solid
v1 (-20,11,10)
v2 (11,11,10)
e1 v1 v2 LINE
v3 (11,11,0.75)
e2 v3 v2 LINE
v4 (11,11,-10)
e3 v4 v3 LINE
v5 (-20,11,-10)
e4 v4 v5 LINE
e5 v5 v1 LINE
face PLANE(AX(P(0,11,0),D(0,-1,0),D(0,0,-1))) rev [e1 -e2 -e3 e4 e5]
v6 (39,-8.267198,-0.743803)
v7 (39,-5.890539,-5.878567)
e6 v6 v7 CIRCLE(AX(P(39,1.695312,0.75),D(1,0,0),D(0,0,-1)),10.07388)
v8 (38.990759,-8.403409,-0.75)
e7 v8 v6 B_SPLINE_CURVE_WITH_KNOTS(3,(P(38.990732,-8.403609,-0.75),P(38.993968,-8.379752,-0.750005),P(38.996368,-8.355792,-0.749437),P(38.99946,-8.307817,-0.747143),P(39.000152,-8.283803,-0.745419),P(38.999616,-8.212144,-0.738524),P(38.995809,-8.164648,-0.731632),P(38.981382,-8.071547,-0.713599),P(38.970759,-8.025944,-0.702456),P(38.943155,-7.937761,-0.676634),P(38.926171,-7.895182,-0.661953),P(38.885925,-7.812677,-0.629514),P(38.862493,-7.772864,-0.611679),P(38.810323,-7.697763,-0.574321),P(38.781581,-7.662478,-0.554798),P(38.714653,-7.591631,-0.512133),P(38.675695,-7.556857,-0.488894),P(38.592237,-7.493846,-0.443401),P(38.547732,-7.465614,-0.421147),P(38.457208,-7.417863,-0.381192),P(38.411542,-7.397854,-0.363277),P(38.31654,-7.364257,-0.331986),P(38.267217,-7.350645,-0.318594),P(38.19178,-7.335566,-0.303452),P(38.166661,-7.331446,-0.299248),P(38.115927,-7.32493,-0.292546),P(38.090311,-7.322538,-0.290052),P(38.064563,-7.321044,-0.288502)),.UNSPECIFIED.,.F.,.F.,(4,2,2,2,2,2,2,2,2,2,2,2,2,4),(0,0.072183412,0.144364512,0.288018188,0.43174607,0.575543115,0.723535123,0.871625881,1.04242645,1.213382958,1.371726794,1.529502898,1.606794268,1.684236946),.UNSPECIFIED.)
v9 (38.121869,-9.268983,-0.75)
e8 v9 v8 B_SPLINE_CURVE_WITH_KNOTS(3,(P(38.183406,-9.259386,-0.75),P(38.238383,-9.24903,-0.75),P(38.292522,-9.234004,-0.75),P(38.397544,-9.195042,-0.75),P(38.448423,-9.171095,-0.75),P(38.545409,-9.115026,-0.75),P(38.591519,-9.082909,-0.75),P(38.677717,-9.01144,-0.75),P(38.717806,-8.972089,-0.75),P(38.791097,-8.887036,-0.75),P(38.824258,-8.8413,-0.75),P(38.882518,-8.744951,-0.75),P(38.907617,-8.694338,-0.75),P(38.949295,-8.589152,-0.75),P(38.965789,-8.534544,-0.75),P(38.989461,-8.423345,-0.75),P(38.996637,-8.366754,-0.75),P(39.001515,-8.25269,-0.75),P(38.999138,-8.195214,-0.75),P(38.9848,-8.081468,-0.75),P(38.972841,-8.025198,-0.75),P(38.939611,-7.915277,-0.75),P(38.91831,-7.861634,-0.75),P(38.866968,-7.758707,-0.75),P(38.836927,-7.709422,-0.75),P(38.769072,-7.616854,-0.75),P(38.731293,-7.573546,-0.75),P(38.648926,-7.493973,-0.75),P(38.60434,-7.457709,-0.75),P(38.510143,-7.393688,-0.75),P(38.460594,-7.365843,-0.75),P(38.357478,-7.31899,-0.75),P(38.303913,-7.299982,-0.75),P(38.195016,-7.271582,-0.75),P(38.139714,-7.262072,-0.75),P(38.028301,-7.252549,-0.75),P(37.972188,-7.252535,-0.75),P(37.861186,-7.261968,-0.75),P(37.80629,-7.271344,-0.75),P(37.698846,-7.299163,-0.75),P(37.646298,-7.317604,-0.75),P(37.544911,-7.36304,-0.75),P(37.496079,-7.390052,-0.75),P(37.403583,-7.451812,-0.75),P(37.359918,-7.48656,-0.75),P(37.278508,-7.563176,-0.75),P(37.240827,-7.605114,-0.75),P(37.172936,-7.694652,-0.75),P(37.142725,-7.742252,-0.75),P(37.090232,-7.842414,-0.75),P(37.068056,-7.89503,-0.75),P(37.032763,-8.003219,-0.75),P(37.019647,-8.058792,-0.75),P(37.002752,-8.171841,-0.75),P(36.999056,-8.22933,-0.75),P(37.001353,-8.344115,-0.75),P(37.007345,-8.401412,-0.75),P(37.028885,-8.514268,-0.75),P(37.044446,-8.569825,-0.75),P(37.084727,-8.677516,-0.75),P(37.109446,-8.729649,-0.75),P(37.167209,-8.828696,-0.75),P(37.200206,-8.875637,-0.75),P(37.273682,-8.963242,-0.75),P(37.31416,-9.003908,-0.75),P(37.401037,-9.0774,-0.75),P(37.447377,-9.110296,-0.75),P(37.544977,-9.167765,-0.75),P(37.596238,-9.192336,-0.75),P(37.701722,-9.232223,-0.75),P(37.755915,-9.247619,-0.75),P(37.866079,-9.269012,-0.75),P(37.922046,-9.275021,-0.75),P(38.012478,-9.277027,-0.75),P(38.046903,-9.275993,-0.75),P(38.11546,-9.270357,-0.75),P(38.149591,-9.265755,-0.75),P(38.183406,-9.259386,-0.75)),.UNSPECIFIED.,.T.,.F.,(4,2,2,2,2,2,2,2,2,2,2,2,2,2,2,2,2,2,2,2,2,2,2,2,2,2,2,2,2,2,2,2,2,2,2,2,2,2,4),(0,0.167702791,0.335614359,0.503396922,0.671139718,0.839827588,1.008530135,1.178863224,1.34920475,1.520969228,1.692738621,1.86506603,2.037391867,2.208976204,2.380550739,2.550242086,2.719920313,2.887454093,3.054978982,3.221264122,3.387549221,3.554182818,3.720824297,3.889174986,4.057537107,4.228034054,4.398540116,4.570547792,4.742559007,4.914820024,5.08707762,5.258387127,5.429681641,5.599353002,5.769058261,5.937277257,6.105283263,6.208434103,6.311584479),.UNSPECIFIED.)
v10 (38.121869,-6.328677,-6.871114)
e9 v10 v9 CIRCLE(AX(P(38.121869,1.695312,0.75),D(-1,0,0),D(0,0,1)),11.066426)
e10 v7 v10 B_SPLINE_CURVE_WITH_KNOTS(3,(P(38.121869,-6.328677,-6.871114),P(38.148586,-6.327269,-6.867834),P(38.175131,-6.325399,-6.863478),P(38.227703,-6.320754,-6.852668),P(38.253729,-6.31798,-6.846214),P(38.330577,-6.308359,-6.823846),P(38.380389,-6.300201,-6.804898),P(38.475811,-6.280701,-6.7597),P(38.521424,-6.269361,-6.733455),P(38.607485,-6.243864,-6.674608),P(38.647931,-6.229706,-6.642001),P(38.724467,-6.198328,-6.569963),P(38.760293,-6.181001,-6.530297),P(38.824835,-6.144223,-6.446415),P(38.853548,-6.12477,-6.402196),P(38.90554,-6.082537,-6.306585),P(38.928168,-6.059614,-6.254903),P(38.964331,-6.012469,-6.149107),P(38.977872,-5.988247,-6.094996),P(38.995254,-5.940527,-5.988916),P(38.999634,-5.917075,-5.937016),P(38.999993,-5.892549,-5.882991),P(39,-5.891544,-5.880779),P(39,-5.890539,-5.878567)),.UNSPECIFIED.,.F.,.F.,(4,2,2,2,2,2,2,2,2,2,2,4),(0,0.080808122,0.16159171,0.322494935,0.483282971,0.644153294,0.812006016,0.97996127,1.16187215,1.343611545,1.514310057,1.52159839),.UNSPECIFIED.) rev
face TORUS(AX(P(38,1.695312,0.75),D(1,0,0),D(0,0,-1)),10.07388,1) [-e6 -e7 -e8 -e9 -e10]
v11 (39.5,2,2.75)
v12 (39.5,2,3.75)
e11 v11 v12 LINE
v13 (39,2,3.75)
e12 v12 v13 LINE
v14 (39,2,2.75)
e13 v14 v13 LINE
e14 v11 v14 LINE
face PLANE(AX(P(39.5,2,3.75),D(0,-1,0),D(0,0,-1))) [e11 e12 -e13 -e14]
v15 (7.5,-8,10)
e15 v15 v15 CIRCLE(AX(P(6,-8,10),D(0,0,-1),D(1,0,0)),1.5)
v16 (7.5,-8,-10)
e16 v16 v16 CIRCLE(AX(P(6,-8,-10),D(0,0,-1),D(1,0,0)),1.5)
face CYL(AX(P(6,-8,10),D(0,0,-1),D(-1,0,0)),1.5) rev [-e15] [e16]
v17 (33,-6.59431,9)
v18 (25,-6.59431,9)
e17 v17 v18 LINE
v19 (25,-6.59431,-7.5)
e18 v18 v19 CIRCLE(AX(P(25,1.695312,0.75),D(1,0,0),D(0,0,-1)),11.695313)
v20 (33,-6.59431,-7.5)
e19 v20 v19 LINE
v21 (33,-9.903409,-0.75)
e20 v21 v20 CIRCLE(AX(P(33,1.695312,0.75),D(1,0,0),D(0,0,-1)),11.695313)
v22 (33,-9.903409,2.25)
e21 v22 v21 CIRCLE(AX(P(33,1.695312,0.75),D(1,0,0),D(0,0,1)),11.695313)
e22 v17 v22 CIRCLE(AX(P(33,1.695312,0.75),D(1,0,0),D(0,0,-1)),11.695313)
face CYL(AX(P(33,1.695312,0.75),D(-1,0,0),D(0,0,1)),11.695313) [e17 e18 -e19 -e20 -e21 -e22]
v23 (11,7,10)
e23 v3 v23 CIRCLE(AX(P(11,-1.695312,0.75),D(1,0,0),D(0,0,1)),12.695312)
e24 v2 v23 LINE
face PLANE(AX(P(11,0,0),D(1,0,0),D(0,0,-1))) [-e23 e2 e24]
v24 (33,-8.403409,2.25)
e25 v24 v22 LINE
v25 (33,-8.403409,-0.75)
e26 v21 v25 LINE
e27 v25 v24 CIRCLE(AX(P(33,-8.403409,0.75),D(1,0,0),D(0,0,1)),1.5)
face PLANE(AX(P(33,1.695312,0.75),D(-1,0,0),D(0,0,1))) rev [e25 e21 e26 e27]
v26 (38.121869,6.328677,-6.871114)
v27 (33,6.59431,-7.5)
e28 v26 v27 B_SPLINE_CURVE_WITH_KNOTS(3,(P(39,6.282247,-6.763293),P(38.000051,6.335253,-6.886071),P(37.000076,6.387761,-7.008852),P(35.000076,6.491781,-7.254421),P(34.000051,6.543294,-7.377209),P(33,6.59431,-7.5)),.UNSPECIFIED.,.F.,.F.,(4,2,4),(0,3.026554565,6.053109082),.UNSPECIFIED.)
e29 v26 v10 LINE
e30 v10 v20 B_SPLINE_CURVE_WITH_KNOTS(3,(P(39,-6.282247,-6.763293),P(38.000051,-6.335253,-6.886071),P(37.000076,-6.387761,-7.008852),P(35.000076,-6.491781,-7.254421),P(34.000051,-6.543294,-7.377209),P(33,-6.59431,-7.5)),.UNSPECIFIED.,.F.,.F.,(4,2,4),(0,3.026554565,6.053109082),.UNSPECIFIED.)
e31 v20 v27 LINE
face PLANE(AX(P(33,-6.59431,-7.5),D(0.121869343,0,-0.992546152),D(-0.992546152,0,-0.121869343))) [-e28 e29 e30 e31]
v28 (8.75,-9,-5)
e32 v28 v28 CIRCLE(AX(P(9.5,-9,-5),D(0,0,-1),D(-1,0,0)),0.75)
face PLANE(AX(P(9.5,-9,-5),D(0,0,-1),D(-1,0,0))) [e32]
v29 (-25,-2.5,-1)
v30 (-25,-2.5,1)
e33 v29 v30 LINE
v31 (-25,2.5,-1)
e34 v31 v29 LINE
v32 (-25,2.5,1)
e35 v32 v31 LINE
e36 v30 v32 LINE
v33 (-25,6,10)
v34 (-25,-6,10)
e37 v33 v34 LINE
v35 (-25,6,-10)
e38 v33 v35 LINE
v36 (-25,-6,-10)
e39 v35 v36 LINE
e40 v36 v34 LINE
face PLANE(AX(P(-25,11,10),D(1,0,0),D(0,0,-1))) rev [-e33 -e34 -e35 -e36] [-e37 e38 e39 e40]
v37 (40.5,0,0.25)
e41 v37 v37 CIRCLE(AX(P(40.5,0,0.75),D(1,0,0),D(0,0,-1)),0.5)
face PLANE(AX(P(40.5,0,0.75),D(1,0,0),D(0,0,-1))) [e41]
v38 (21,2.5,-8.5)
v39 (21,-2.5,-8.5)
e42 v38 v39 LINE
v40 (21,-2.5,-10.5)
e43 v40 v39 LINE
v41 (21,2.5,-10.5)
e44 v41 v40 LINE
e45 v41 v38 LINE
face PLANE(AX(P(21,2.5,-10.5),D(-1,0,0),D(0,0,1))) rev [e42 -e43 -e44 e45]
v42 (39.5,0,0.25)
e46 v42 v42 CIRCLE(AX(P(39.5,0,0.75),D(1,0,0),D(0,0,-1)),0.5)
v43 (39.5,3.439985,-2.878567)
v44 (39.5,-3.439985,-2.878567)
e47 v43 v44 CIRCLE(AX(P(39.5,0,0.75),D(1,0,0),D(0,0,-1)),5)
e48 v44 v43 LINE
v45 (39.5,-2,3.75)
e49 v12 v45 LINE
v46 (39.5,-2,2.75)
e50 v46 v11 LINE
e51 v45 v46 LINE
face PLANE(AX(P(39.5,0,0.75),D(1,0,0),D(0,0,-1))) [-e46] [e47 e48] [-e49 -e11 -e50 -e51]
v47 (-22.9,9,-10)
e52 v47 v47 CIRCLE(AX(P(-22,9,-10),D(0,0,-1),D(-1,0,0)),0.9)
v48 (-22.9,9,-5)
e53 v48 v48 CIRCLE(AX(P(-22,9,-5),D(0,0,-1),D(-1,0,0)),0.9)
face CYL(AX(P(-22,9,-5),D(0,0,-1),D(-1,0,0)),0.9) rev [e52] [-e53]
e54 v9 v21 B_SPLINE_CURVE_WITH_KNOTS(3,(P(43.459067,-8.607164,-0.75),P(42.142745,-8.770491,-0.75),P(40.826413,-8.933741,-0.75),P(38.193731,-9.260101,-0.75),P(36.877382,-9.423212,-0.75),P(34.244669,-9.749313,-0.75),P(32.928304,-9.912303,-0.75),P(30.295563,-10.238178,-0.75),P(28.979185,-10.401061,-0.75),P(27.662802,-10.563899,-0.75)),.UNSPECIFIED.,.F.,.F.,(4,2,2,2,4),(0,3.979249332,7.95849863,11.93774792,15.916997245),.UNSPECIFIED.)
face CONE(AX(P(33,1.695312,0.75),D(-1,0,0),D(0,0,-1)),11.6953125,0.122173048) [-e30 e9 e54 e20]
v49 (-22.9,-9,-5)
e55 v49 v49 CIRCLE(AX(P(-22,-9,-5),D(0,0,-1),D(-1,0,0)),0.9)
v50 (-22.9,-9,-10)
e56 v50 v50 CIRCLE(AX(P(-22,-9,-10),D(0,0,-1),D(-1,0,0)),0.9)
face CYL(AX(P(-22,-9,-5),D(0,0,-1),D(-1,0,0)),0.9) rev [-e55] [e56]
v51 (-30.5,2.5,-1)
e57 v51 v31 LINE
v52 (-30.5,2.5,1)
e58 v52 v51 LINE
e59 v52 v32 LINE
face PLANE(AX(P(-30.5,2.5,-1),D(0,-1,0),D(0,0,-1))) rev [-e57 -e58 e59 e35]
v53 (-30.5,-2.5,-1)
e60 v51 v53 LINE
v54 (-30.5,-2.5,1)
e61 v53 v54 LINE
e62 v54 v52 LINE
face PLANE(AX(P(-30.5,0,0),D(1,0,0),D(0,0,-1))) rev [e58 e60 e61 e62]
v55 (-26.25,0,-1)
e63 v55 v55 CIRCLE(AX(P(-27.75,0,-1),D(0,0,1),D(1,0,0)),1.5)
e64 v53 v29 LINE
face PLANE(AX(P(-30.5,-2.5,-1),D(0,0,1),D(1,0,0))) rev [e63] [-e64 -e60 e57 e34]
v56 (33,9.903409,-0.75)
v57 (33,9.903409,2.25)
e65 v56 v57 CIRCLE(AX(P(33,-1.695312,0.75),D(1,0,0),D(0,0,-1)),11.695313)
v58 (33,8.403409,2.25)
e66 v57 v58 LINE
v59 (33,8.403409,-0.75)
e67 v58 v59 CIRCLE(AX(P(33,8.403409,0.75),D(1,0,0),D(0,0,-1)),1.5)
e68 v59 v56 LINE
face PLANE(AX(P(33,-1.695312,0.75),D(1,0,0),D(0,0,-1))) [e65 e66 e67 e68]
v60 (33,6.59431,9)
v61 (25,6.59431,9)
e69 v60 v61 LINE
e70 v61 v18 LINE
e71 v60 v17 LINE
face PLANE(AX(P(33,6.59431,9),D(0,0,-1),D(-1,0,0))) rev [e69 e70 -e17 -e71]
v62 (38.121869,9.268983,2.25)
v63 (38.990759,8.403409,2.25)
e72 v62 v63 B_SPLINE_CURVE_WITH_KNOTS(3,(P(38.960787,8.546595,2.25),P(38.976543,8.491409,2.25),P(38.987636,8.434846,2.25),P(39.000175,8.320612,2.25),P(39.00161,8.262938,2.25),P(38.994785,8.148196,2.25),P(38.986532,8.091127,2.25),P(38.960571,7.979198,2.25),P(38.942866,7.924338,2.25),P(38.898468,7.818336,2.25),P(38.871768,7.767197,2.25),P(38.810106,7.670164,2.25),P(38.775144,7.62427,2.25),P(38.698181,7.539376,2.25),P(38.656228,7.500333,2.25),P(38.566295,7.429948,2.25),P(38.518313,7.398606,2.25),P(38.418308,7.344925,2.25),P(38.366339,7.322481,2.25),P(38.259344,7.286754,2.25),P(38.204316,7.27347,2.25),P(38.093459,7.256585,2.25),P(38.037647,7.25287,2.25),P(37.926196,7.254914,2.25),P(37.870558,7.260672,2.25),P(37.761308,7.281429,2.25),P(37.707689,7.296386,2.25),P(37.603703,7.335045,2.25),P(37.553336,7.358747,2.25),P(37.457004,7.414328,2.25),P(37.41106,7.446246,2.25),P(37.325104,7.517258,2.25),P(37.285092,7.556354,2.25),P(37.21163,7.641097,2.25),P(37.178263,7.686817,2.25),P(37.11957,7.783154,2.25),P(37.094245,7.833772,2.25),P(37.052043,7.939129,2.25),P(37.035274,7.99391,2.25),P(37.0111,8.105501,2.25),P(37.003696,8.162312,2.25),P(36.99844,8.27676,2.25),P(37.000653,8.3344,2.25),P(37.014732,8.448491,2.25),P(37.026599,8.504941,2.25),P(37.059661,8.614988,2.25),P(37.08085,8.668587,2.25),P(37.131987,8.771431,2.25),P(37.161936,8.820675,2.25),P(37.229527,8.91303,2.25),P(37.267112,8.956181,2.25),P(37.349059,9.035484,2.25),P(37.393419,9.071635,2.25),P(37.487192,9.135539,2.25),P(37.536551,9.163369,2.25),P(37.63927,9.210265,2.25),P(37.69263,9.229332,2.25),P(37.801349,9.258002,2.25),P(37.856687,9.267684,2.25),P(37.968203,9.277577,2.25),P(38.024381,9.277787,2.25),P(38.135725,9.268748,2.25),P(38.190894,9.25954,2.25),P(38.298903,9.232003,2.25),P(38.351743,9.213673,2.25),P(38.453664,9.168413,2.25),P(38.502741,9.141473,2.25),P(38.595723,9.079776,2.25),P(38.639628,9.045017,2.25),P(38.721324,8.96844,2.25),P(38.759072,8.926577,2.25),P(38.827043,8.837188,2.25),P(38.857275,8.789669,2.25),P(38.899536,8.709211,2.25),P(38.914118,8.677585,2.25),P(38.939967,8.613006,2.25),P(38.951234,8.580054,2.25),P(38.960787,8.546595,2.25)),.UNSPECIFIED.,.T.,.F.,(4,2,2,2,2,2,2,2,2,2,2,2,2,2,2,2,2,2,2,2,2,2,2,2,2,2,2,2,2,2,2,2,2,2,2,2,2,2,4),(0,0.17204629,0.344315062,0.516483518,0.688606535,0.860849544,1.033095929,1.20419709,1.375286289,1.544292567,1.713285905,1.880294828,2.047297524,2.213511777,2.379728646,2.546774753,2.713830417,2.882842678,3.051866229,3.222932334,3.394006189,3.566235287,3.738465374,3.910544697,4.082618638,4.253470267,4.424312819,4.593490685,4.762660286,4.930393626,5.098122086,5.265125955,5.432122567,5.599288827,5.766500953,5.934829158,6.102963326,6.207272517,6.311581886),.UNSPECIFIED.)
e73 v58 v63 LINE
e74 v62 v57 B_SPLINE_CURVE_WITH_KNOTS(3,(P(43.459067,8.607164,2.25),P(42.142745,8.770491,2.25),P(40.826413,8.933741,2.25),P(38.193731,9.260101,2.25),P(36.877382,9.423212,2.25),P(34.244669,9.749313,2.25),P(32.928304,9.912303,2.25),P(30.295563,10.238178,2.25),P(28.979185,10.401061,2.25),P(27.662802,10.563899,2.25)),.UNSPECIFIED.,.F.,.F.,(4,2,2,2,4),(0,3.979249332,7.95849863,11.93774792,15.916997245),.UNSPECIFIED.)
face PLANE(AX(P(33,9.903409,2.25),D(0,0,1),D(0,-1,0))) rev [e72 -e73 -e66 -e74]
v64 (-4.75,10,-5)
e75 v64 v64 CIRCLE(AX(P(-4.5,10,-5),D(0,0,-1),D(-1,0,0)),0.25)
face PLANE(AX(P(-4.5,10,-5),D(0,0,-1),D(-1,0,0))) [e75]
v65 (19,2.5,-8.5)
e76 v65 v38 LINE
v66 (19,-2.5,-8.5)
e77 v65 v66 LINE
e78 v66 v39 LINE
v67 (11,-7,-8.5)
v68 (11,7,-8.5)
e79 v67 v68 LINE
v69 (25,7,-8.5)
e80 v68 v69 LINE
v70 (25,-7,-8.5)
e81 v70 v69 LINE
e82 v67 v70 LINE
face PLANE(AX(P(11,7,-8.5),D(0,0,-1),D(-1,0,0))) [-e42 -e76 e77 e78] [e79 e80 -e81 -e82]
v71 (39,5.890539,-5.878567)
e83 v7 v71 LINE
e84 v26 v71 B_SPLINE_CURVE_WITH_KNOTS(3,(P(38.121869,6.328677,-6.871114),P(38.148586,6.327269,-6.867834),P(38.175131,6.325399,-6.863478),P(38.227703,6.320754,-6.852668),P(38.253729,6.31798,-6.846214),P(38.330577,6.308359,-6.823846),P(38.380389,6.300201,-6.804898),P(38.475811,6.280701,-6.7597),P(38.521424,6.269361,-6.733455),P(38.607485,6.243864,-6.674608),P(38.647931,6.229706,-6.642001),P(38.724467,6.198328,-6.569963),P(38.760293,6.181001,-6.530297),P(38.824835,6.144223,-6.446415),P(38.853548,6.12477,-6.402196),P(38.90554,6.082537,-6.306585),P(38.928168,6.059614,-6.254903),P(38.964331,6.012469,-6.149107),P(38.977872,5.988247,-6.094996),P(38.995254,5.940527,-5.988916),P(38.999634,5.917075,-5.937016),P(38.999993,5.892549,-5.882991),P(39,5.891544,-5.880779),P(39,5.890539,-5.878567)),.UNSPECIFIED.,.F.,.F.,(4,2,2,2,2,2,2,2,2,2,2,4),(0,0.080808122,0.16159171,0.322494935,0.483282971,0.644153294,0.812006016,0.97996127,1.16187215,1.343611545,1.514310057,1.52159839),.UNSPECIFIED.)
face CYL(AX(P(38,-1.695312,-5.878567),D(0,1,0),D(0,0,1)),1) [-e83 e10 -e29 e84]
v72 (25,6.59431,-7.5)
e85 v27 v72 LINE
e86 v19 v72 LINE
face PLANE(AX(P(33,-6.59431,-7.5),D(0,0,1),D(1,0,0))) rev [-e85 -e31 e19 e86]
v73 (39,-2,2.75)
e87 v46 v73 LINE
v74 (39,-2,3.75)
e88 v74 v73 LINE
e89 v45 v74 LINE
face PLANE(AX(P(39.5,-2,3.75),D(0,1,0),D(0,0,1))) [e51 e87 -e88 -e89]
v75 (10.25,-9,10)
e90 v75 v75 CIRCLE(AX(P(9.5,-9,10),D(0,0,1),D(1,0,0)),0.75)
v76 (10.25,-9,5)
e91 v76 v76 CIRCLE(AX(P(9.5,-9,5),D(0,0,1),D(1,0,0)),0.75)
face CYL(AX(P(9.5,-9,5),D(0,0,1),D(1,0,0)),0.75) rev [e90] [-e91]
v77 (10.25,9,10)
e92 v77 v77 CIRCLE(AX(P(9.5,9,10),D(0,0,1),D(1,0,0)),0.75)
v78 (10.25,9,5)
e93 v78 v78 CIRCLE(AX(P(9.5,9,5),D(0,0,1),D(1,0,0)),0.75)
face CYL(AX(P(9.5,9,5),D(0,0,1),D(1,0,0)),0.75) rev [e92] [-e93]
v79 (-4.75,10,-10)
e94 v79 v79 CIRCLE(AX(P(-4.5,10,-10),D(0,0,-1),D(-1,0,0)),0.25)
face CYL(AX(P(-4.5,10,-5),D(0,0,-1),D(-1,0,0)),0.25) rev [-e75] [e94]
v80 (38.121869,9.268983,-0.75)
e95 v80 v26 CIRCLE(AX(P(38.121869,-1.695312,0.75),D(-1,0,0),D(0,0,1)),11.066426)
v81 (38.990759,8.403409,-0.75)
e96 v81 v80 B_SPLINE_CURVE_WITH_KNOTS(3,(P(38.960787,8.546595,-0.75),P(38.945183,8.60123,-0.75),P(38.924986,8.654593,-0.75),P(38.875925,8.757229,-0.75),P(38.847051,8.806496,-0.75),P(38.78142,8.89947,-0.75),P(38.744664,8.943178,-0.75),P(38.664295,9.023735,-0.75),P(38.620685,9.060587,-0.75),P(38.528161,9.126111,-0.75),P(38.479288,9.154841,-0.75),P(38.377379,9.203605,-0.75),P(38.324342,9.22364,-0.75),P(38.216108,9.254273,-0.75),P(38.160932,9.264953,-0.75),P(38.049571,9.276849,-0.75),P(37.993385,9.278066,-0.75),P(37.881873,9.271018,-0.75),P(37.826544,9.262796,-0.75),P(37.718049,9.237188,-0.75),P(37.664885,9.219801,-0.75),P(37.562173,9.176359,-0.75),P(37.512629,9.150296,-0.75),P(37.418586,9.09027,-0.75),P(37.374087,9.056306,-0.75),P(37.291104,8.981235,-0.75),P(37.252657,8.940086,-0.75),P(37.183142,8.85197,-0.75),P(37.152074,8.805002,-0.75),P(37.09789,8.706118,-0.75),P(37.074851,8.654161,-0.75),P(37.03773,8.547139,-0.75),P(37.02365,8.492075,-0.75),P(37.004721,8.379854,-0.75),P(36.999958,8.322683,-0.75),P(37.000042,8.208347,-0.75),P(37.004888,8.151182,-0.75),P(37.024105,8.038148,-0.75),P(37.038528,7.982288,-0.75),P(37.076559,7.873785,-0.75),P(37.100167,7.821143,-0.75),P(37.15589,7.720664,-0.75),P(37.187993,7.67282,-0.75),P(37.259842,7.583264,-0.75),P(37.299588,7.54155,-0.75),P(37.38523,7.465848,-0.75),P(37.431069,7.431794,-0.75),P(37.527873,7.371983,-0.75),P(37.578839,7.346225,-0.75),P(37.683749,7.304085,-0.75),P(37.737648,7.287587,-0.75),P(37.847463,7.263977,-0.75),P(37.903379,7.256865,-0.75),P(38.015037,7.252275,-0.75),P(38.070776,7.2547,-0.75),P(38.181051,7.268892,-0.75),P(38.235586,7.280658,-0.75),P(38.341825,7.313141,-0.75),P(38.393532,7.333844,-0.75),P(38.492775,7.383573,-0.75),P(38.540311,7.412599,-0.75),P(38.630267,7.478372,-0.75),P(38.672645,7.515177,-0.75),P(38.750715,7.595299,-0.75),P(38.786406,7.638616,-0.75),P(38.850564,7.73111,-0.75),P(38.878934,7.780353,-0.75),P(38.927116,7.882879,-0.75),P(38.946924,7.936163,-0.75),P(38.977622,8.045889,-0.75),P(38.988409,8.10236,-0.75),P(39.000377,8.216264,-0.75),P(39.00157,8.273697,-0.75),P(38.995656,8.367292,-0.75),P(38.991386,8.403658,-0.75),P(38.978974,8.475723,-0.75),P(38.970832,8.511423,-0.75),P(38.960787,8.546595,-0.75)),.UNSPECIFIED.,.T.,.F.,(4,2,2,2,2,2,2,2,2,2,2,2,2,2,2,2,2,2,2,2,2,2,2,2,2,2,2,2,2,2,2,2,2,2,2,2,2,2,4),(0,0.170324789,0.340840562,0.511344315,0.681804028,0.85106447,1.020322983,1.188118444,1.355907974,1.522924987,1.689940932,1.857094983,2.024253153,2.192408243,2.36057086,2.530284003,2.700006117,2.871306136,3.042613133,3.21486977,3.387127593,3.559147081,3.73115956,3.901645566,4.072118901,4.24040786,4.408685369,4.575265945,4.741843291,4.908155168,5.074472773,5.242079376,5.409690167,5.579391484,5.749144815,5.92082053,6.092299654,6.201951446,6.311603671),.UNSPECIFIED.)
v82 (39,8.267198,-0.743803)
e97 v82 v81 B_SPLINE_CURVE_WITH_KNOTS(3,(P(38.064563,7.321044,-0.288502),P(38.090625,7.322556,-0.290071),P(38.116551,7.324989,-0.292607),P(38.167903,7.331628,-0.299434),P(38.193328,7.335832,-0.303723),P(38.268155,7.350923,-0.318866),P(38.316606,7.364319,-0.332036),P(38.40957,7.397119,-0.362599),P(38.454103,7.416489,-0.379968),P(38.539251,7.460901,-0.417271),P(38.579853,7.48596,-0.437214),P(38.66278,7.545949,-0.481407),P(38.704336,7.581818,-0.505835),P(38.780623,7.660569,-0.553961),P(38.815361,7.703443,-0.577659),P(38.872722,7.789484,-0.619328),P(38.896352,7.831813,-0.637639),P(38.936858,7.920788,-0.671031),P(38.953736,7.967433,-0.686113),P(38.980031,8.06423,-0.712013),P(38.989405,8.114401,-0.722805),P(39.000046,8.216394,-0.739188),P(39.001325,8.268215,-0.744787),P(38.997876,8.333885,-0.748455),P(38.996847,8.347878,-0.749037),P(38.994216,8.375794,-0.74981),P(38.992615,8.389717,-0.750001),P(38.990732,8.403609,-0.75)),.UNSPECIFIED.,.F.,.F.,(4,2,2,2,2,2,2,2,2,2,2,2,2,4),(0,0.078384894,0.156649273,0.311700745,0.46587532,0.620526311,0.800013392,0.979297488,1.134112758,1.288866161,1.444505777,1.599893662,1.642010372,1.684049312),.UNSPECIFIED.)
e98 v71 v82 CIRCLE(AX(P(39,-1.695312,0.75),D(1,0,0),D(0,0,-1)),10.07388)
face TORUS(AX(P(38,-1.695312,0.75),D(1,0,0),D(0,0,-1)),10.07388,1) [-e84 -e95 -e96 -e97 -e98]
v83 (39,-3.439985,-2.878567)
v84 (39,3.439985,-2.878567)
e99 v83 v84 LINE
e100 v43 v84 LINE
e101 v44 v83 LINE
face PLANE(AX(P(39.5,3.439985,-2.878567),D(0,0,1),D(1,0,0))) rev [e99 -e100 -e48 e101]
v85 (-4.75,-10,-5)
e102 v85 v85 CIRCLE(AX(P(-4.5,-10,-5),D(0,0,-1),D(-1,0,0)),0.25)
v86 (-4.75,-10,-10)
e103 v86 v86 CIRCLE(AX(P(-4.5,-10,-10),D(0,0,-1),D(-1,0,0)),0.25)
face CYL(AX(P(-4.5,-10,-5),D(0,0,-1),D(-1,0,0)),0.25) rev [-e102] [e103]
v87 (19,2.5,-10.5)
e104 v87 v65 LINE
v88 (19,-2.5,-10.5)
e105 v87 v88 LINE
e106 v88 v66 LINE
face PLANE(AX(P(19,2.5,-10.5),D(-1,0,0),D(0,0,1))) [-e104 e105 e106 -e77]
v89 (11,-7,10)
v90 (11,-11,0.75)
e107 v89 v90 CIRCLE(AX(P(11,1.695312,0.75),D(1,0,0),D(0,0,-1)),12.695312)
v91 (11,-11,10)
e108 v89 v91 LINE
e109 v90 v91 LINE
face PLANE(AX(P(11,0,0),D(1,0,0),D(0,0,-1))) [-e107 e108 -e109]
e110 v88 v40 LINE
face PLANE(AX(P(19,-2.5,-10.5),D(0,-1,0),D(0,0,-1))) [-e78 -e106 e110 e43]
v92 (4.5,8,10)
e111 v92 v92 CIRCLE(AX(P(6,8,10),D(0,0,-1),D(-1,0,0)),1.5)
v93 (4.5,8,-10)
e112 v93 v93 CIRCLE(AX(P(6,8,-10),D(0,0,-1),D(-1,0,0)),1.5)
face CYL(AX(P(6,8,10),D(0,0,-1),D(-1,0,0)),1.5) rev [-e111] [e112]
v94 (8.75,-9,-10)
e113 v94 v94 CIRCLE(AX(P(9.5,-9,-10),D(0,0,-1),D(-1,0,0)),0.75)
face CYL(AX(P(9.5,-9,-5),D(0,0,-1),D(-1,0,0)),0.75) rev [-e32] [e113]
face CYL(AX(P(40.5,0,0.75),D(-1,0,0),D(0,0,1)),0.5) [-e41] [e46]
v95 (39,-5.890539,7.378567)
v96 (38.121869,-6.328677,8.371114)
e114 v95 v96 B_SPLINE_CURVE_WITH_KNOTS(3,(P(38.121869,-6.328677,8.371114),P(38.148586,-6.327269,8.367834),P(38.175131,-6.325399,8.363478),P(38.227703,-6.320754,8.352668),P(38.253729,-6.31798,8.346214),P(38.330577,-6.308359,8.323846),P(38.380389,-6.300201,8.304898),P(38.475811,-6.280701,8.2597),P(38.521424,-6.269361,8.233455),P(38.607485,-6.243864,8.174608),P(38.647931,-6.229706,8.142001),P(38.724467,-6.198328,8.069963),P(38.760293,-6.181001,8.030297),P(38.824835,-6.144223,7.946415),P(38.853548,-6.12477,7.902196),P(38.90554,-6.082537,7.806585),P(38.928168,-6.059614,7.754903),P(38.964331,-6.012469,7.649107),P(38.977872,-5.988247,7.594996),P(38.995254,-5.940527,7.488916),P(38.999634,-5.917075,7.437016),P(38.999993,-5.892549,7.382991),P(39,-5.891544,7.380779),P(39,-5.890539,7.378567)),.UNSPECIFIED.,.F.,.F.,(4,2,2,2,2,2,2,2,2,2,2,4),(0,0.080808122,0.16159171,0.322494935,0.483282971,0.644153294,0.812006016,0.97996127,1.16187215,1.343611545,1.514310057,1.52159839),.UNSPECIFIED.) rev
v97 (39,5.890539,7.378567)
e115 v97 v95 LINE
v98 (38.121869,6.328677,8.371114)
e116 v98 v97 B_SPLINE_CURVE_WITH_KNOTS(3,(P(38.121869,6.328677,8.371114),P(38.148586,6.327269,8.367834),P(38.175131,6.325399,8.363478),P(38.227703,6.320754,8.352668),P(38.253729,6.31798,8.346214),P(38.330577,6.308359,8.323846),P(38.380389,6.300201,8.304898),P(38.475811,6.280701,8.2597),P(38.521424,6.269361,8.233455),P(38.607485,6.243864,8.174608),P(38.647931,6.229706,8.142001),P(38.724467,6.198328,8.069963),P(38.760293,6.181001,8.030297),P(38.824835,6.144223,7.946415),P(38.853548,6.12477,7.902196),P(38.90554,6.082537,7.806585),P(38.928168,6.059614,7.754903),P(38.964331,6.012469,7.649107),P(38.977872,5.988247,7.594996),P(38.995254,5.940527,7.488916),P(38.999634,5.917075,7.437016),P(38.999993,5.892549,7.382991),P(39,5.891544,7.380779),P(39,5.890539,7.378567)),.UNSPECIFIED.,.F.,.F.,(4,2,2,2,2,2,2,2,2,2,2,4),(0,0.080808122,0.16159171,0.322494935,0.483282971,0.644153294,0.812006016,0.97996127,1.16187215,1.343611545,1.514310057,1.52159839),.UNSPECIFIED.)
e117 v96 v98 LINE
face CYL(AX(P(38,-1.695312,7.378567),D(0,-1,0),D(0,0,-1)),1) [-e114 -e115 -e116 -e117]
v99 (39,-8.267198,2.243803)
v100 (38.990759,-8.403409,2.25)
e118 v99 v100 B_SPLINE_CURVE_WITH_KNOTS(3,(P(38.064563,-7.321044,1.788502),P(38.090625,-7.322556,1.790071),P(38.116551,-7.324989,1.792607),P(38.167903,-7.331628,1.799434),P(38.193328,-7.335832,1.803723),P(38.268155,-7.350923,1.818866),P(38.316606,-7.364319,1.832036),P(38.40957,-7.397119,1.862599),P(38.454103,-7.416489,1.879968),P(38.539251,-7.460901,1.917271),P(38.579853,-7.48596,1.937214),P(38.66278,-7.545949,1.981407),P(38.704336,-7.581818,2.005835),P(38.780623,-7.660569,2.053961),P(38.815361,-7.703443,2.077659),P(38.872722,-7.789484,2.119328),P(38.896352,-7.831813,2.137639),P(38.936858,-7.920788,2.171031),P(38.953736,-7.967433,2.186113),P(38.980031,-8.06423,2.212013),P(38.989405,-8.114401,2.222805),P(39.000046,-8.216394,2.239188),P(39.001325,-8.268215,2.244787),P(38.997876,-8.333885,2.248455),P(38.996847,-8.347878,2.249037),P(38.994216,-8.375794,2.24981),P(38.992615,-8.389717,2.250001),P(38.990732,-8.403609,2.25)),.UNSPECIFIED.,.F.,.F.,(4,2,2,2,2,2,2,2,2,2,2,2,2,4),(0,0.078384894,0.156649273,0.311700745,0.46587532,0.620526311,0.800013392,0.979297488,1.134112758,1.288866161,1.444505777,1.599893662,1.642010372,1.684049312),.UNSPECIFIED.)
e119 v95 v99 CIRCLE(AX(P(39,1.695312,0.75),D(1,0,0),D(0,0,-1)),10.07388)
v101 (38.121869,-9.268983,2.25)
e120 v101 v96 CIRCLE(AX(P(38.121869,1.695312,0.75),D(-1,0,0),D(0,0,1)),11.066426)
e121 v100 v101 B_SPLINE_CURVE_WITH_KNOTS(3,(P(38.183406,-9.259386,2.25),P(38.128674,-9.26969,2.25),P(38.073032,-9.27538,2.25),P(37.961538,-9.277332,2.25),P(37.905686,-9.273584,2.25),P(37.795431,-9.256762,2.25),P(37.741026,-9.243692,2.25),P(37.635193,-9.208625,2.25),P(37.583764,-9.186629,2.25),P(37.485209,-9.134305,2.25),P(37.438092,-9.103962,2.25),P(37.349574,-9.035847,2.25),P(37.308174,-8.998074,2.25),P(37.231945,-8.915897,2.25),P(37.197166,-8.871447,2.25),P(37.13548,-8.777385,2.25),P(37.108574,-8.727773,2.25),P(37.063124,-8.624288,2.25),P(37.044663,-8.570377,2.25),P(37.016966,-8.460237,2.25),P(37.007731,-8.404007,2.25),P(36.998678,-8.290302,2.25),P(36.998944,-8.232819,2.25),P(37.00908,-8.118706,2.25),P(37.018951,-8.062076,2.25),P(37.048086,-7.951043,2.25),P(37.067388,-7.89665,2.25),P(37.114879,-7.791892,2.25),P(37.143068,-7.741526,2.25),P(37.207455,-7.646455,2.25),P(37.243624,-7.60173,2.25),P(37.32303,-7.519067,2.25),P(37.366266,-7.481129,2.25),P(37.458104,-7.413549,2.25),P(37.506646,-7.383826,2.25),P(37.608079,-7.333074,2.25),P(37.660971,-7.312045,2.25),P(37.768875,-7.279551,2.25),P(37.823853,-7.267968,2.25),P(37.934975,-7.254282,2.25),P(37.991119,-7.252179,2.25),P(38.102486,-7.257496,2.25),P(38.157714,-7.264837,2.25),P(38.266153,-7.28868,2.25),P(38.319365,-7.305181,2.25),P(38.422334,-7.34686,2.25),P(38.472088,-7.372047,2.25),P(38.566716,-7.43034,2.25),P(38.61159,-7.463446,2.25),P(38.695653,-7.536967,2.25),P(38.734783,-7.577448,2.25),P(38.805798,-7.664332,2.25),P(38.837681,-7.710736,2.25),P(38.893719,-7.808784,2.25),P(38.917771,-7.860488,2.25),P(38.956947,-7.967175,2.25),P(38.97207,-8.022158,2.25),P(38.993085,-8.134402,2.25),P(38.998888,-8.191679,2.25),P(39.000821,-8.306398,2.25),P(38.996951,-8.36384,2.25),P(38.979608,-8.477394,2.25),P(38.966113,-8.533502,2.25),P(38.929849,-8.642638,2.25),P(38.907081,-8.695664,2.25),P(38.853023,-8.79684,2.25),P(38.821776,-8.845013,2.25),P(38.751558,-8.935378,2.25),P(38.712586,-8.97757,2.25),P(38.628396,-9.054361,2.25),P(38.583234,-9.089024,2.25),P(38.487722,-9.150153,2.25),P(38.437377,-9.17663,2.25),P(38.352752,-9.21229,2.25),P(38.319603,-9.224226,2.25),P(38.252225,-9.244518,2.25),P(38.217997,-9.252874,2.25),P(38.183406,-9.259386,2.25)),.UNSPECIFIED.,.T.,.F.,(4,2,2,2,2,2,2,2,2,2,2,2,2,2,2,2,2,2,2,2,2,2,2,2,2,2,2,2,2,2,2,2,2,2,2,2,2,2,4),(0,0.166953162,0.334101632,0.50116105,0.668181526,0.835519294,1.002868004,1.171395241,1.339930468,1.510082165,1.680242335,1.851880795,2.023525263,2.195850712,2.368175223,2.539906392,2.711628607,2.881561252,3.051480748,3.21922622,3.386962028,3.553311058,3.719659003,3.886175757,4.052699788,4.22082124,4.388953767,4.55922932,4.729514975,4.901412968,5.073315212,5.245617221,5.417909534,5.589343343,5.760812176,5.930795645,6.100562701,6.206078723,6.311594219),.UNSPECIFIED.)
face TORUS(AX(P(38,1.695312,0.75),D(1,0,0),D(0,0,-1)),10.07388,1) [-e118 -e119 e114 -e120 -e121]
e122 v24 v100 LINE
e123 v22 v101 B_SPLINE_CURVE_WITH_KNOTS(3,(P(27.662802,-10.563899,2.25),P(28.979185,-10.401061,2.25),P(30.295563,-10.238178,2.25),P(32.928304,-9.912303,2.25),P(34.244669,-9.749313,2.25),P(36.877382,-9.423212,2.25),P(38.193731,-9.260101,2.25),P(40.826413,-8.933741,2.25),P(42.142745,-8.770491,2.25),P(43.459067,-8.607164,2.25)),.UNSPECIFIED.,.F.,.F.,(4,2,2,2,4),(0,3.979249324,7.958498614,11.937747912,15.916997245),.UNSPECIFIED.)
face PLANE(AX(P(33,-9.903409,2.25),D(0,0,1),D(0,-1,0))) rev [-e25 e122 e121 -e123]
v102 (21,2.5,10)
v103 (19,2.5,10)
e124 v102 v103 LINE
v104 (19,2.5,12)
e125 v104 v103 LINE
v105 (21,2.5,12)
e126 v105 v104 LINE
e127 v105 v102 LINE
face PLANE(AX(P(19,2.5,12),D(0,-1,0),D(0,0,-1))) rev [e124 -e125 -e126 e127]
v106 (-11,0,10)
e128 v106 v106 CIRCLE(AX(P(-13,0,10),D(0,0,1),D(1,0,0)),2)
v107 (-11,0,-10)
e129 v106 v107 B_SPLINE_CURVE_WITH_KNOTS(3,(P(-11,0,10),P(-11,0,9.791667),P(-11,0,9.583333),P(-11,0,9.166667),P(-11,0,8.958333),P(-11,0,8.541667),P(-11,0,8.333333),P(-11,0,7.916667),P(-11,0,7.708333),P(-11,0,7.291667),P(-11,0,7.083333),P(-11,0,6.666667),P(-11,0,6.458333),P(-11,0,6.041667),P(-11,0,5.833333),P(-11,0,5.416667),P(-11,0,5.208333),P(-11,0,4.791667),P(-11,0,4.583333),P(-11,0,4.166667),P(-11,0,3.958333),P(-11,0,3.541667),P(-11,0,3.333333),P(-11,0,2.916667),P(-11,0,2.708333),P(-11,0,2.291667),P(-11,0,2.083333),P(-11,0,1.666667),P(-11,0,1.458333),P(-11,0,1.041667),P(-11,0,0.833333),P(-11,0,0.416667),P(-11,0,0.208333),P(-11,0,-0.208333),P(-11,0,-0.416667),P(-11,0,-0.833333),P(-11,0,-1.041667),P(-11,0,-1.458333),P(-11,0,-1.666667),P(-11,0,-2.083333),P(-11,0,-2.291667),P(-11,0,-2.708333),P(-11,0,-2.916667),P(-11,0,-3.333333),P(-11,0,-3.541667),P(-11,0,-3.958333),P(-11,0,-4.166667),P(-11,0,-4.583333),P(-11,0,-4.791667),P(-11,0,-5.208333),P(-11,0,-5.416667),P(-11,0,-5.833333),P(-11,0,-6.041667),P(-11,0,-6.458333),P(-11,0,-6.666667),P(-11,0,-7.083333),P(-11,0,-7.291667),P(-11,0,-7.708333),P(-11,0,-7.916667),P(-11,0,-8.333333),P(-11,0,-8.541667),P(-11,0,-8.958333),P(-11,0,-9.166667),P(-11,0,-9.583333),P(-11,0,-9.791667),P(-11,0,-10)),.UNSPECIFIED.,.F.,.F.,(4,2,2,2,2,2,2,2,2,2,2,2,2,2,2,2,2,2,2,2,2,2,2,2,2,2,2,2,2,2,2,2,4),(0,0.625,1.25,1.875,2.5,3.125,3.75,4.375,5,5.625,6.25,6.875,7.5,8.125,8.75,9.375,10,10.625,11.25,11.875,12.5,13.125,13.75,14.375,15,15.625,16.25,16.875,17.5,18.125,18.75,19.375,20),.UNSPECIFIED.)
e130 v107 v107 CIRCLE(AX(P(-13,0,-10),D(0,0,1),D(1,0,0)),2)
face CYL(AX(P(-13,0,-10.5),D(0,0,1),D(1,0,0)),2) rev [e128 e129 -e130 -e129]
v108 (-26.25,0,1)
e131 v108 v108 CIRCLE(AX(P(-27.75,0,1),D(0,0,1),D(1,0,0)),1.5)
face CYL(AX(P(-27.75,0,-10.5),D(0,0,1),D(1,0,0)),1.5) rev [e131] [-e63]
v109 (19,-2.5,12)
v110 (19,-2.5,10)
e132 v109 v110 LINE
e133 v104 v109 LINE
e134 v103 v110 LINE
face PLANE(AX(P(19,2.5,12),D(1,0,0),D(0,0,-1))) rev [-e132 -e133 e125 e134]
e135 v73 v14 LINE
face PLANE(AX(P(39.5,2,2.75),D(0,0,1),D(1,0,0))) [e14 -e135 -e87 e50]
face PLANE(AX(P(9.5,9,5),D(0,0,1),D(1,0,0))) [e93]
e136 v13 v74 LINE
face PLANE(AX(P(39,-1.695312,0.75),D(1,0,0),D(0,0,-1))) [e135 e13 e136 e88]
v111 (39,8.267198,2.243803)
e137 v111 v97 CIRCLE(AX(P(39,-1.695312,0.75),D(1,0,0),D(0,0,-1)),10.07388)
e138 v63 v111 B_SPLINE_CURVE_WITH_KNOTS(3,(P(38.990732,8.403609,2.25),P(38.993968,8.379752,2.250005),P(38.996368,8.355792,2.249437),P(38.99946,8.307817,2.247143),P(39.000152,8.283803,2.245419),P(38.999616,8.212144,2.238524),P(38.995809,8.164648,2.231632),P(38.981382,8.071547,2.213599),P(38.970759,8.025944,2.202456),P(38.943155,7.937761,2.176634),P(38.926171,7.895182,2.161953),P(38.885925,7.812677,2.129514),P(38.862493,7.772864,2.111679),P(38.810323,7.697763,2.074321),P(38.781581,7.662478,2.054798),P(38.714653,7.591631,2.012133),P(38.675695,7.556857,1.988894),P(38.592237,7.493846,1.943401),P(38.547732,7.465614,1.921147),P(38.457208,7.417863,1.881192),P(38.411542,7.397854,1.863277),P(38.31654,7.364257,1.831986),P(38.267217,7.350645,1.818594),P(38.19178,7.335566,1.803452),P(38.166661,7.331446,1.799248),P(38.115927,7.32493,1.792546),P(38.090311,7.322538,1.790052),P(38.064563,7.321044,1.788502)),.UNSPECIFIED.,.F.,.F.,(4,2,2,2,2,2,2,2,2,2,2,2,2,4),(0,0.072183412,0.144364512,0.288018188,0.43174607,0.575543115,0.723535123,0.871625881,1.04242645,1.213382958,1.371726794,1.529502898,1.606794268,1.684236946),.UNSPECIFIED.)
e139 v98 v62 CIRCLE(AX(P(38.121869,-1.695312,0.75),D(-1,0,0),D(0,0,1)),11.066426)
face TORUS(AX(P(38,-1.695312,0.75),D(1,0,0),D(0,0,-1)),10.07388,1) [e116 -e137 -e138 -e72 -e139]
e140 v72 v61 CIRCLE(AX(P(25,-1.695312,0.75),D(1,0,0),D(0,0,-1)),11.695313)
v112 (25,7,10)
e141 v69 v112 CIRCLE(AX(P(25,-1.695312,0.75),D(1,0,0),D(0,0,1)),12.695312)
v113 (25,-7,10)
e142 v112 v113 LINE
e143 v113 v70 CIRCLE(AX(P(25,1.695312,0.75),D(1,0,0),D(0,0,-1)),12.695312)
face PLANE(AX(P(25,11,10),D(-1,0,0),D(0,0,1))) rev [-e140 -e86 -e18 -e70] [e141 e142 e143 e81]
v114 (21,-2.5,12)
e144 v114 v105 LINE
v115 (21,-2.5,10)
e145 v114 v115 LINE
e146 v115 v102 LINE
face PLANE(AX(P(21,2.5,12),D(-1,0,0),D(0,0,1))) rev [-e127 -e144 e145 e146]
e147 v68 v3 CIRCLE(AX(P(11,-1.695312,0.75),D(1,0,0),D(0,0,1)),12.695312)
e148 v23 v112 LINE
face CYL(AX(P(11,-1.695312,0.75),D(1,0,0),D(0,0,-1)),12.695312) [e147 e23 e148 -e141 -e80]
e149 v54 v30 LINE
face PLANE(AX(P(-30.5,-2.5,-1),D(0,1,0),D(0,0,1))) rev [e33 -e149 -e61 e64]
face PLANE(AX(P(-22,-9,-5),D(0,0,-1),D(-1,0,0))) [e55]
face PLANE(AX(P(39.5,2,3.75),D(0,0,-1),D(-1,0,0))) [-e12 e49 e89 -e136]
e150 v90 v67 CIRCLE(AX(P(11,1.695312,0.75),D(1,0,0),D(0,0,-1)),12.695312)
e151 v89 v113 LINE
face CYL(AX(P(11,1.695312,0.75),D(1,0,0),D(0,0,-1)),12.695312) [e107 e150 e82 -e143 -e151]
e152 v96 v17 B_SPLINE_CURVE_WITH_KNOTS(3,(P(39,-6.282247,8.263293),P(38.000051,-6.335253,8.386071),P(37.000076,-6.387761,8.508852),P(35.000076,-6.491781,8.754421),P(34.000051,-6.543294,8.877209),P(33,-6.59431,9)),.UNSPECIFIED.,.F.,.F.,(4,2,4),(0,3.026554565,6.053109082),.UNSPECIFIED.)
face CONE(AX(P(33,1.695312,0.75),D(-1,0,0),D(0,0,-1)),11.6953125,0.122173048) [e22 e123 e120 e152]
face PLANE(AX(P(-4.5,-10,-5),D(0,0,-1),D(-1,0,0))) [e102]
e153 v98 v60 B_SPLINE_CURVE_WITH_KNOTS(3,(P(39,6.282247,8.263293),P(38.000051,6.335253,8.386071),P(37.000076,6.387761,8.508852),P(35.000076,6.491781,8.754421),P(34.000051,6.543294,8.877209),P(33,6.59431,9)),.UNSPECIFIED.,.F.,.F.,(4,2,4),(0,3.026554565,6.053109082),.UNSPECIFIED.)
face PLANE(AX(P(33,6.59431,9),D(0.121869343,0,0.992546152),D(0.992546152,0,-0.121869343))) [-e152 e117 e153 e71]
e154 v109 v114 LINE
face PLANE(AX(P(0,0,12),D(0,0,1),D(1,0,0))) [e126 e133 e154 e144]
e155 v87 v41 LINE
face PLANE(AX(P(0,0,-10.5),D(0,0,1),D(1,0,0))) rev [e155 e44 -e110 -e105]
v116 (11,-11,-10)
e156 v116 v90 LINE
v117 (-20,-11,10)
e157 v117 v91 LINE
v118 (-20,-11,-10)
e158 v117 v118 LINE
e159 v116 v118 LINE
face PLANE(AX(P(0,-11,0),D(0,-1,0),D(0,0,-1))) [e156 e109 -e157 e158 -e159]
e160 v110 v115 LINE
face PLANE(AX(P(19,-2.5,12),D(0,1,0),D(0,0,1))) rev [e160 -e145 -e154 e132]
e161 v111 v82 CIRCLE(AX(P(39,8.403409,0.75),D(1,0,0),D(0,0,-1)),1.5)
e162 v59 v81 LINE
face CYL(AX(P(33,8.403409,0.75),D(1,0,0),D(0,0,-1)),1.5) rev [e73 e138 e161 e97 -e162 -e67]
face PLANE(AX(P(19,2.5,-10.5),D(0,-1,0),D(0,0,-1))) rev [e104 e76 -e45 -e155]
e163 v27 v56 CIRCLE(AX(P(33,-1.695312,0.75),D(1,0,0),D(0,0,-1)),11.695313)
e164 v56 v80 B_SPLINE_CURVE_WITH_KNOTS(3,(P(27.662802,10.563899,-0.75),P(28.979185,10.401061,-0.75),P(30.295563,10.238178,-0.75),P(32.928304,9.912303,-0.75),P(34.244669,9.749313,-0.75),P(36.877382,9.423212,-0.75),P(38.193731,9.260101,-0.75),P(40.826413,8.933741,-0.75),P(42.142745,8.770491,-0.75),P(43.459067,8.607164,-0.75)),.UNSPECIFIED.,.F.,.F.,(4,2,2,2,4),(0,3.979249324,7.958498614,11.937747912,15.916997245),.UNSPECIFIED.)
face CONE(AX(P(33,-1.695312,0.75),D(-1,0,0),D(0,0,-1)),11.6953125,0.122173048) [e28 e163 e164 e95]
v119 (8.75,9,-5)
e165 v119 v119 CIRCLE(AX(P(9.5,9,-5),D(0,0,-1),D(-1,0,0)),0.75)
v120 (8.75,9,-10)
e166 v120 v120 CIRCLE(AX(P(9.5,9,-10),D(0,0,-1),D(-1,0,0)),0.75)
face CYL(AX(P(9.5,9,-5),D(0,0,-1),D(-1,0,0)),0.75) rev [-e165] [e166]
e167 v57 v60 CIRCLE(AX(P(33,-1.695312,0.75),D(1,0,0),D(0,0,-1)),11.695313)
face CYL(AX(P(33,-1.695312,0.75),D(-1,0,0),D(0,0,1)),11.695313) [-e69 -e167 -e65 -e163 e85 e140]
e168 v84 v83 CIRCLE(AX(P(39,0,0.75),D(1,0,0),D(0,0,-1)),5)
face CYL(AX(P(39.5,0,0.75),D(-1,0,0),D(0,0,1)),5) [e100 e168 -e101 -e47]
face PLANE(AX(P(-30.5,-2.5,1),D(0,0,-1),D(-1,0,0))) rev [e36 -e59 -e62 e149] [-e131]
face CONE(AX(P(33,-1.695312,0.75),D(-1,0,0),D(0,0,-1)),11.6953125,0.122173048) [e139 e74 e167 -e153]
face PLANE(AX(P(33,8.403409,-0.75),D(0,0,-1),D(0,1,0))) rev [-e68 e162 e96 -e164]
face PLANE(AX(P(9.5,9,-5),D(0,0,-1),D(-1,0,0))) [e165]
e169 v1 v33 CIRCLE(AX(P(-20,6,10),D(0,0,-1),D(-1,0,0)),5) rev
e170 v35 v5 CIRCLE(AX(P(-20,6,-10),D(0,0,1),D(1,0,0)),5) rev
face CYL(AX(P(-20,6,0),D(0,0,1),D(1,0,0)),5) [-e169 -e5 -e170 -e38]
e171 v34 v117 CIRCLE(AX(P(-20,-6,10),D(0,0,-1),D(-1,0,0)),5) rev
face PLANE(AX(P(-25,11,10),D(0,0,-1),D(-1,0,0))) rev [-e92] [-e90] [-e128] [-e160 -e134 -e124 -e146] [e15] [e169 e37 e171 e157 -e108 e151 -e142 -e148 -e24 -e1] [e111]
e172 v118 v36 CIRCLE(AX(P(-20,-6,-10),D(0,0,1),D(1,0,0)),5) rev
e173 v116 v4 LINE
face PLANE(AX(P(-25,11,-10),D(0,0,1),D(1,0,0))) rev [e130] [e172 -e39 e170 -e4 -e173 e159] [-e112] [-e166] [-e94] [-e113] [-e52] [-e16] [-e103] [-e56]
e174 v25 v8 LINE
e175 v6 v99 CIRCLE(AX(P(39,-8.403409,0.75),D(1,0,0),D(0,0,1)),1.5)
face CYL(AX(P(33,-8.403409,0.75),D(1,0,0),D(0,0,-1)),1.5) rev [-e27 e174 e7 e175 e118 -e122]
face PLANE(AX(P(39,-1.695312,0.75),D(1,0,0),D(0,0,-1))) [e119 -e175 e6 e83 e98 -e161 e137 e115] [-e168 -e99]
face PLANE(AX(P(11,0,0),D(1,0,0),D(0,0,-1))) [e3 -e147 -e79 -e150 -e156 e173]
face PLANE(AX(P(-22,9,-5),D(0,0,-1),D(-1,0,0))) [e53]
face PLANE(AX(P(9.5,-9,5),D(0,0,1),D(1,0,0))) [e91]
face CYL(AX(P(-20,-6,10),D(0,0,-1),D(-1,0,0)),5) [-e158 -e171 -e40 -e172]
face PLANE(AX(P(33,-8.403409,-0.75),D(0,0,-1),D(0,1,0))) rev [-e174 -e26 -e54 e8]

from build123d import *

# Parameters (mm, degrees)
CROQUIS1_W               = 50
CROQUIS1_H               = 20
SALIENTE_EXTRUIR1_DEPTH  = 11
REDONDEO1_R              = 5
CROQUIS2_OUTSIDE_W       = 33.634
CROQUIS2_OUTSIDE_H       = 35.634
CORTAR_EXTRUIR1_DEPTH    = 14
CROQUIS3_R               = 1.5
CORTAR_EXTRUIR2_DEPTH    = 34.85262176
CROQUIS4_W               = 2
CROQUIS4_H               = 5
SALIENTE_EXTRUIR2_DEPTH  = 2
CROQUIS5_W               = 2
CROQUIS5_H               = 5
SALIENTE_EXTRUIR5_DEPTH  = 2
CROQUIS6_R               = 0.75
CROQUIS6_R_2             = 0.25
CROQUIS6_R_3             = 0.9
CORTAR_EXTRUIR3_DEPTH    = 5
CORTAR_EXTRUIR4_START    = -5
CROQUIS7_R               = 0.75
CORTAR_EXTRUIR4_DEPTH    = 5
SALIENTE_EXTRUIR6_DEPTH  = 8
CROQUIS9_R               = 2
CORTAR_EXTRUIR5_DEPTH    = 41.376354466
SALIENTE_EXTRUIR7_DEPTH  = 6
SALIENTE_EXTRUIR7_DRAFT  = 7
REDONDEO2_R              = 1
CROQUIS12_W              = 1
CROQUIS12_H              = 4
SALIENTE_EXTRUIR8_DEPTH  = 0.5
CROQUIS13_R              = 0.5
SALIENTE_EXTRUIR9_DEPTH  = 1
CORTAR_EXTRUIR6_START    = -6
CORTAR_EXTRUIR6_DEPTH    = 6
CROQUIS15_W              = 2
CROQUIS15_H              = 5
SALIENTE_EXTRUIR10_DEPTH = 5.5
CROQUIS16_R              = 1.5
CORTAR_EXTRUIR7_DEPTH    = 44.514365444


with BuildPart() as part:
    # Croquis1 → Saliente-Extruir1 (new, symmetric)
    with BuildSketch(Plane(origin=(0, 0, 0), x_dir=(1, 0, 0), z_dir=(0, 1, 0))):
        Rectangle(CROQUIS1_W, CROQUIS1_H)
    extrude(amount=SALIENTE_EXTRUIR1_DEPTH, both=True)

    # Redondeo1
    redondeo1_edges = [part.edges().sort_by_distance(p)[0] for p in [
        (-25, 11, 0),
        (-25, -11, 0),
    ]]
    fillet(redondeo1_edges, radius=REDONDEO1_R)

    # Croquis2 outside → Cortar-Extruir1 (cut)
    with BuildSketch(Plane(origin=(25, 0, 0), x_dir=(0, 0, -1), z_dir=(1, 0, 0))):
        Rectangle(CROQUIS2_OUTSIDE_W, CROQUIS2_OUTSIDE_H)
        with BuildLine():
            Line((-10, 7), (-10, -7))
            ThreePointArc((-10, -7), (-0.75, -11), (8.5, -7))
            Line((8.5, -7), (8.5, 7))
            ThreePointArc((8.5, 7), (-0.75, 11), (-10, 7))
        make_face(mode=Mode.SUBTRACT)
    extrude(amount=-CORTAR_EXTRUIR1_DEPTH, mode=Mode.SUBTRACT)

    # Croquis3 → Cortar-Extruir2 (cut, through all)
    with BuildSketch(Plane(origin=(0, 0, -10), x_dir=(-1, 0, 0), z_dir=(0, 0, -1))):
        with Locations((-6, 8)):
            Circle(CROQUIS3_R)
        with Locations(Location((-6, -8, 0), (0, 0, 180))):
            Circle(CROQUIS3_R)
    extrude(amount=-CORTAR_EXTRUIR2_DEPTH, mode=Mode.SUBTRACT)

    # Croquis4 → Saliente-Extruir2 (add)
    with BuildSketch(Plane.XY.offset(10)):
        with Locations((20, 0)):
            Rectangle(CROQUIS4_W, CROQUIS4_H)
    extrude(amount=SALIENTE_EXTRUIR2_DEPTH)

    # Croquis5 → Saliente-Extruir5 (add)
    with BuildSketch(Plane(origin=(0, 0, -8.5), x_dir=(-1, 0, 0), z_dir=(0, 0, -1))):
        with Locations((-20, 0)):
            Rectangle(CROQUIS5_W, CROQUIS5_H)
    extrude(amount=SALIENTE_EXTRUIR5_DEPTH)

    # Croquis6 → Cortar-Extruir3 (cut)
    with BuildSketch(Plane(origin=(0, 0, -10), x_dir=(-1, 0, 0), z_dir=(0, 0, -1))):
        with Locations((-9.5, 9)):
            Circle(CROQUIS6_R)
        with Locations((-9.5, -9)):
            Circle(CROQUIS6_R)
        with Locations((4.5, -10)):
            Circle(CROQUIS6_R_2)
        with Locations((4.5, 10)):
            Circle(CROQUIS6_R_2)
        with Locations((22, 9)):
            Circle(CROQUIS6_R_3)
        with Locations((22, -9)):
            Circle(CROQUIS6_R_3)
    extrude(amount=-CORTAR_EXTRUIR3_DEPTH, mode=Mode.SUBTRACT)

    # Croquis7 → Cortar-Extruir4 (cut)
    with BuildSketch(Plane.XY.offset(10).offset(CORTAR_EXTRUIR4_START)):
        with Locations(Location((9.5, -9, 0), (0, 0, 180))):
            Circle(CROQUIS7_R)
        with Locations(Location((9.5, 9, 0), (0, 0, 180))):
            Circle(CROQUIS7_R)
    extrude(amount=CORTAR_EXTRUIR4_DEPTH, mode=Mode.SUBTRACT)

    # Croquis8 → Saliente-Extruir6 (add)
    with BuildSketch(Plane(origin=(25, 0, 0), x_dir=(0, 0, -1), z_dir=(1, 0, 0))):
        with BuildLine():
            Line((-9, 6.594309595), (-9, -6.594309595))
            ThreePointArc((-9, -6.594309595), (-0.75, -10), (7.5, -6.594309595))
            Line((7.5, -6.594309595), (7.5, 6.594309595))
            ThreePointArc((7.5, 6.594309595), (-0.75, 10), (-9, 6.594309595))
        make_face()
    extrude(amount=SALIENTE_EXTRUIR6_DEPTH)

    # Croquis9 → Cortar-Extruir5 (cut, through all)
    with BuildSketch(Plane.XY.offset(10)):
        with Locations((-13, 0)):
            Circle(CROQUIS9_R)
    extrude(amount=-CORTAR_EXTRUIR5_DEPTH, mode=Mode.SUBTRACT)


with BuildPart() as saliente_extruir7_tool:
    # Croquis11 → Saliente-Extruir7 (with draft: the straight prism first)
    with BuildSketch(Plane(origin=(33, 0, 0), x_dir=(0, 0, -1), z_dir=(1, 0, 0))):
        with BuildLine():
            Line((-9, 6.594309595), (-9, -6.594309595))
            ThreePointArc((-9, -6.594309595), (-0.75, -10), (7.5, -6.594309595))
            Line((7.5, -6.594309595), (7.5, 6.594309595))
            ThreePointArc((7.5, 6.594309595), (-0.75, 10), (-9, 6.594309595))
        make_face()
    extrude(amount=SALIENTE_EXTRUIR7_DEPTH)
    # Saliente-Extruir7: the draft: its side faces are tilted about the plane it starts from
    saliente_extruir7_sides = [saliente_extruir7_tool.faces().sort_by_distance(p)[0] for p in [
        (36, 0, 9),
        (36, -10, 0.75),
        (36, 0, -7.5),
        (36, 10, 0.75),
    ]]
    draft(saliente_extruir7_sides, Plane(origin=(33, 0, 0), x_dir=(0, 0, -1), z_dir=(1, 0, 0)), SALIENTE_EXTRUIR7_DRAFT)


with BuildPart() as part_1:
    add(part.part)

    # Saliente-Extruir7: add saliente_extruir7_tool
    add(saliente_extruir7_tool.part)

    # Redondeo2
    redondeo2_edges = [part_1.edges().sort_by_distance(p)[0] for p in [
        (39, 0, -6.763292635),
        (39, -9.263292635, 0.75),
        (39, 0, 8.263292635),
        (39, 9.263292635, 0.75),
    ]]
    fillet(redondeo2_edges, radius=REDONDEO2_R - 0.0001)  # a hair under: the kernel refuses the full size

    # Croquis12 → Saliente-Extruir8 (add)
    with BuildSketch(Plane(origin=(39, 0, 0), x_dir=(0, 0, -1), z_dir=(1, 0, 0))):
        with BuildLine():
            Line((2.87856737, 3.439985297), (2.87856737, -3.439985297))
            ThreePointArc((2.87856737, -3.439985297), (-5.75, 0), (2.87856737, 3.439985297))
        make_face()
        with Locations((-3.25, 0)):
            Rectangle(CROQUIS12_W, CROQUIS12_H, mode=Mode.SUBTRACT)
    extrude(amount=SALIENTE_EXTRUIR8_DEPTH)

    # Croquis13 → Saliente-Extruir9 (add)
    with BuildSketch(Plane(origin=(39.5, 0, 0), x_dir=(0, 0, -1), z_dir=(1, 0, 0))):
        with Locations((-0.75, 0)):
            Circle(CROQUIS13_R)
    extrude(amount=SALIENTE_EXTRUIR9_DEPTH)

    # Croquis14 → Cortar-Extruir6 (cut)
    with BuildSketch(Plane(origin=(39, 0, 0), x_dir=(0, 0, -1), z_dir=(1, 0, 0)).offset(CORTAR_EXTRUIR6_START)):
        with BuildLine():
            Line((-2.25, 9.903408743), (-2.25, 8.403408743))
            ThreePointArc((-2.25, 8.403408743), (-0.75, 6.903408743), (0.75, 8.403408743))
            Line((0.75, 8.403408743), (0.75, 9.903408743))
            ThreePointArc((0.75, 9.903408743), (-0.75, 10), (-2.25, 9.903408743))
        make_face()
        with BuildLine():
            Line((-2.25, -9.903408743), (-2.25, -8.403408743))
            ThreePointArc((-2.25, -8.403408743), (-0.75, -6.903408743), (0.75, -8.403408743))
            Line((0.75, -8.403408743), (0.75, -9.903408743))
            ThreePointArc((0.75, -9.903408743), (-0.75, -10), (-2.25, -9.903408743))
        make_face()
    extrude(amount=CORTAR_EXTRUIR6_DEPTH, mode=Mode.SUBTRACT)

    # Croquis15 → Saliente-Extruir10 (add)
    with BuildSketch(Plane.ZY.offset(25)):
        Rectangle(CROQUIS15_W, CROQUIS15_H)
    extrude(amount=SALIENTE_EXTRUIR10_DEPTH)

    # Croquis16 → Cortar-Extruir7 (cut, through all)
    with BuildSketch(Plane.XY.offset(1)):
        with Locations((-27.75, 0)):
            Circle(CROQUIS16_R)
    extrude(amount=-CORTAR_EXTRUIR7_DEPTH, mode=Mode.SUBTRACT)


solid = part_1.part
